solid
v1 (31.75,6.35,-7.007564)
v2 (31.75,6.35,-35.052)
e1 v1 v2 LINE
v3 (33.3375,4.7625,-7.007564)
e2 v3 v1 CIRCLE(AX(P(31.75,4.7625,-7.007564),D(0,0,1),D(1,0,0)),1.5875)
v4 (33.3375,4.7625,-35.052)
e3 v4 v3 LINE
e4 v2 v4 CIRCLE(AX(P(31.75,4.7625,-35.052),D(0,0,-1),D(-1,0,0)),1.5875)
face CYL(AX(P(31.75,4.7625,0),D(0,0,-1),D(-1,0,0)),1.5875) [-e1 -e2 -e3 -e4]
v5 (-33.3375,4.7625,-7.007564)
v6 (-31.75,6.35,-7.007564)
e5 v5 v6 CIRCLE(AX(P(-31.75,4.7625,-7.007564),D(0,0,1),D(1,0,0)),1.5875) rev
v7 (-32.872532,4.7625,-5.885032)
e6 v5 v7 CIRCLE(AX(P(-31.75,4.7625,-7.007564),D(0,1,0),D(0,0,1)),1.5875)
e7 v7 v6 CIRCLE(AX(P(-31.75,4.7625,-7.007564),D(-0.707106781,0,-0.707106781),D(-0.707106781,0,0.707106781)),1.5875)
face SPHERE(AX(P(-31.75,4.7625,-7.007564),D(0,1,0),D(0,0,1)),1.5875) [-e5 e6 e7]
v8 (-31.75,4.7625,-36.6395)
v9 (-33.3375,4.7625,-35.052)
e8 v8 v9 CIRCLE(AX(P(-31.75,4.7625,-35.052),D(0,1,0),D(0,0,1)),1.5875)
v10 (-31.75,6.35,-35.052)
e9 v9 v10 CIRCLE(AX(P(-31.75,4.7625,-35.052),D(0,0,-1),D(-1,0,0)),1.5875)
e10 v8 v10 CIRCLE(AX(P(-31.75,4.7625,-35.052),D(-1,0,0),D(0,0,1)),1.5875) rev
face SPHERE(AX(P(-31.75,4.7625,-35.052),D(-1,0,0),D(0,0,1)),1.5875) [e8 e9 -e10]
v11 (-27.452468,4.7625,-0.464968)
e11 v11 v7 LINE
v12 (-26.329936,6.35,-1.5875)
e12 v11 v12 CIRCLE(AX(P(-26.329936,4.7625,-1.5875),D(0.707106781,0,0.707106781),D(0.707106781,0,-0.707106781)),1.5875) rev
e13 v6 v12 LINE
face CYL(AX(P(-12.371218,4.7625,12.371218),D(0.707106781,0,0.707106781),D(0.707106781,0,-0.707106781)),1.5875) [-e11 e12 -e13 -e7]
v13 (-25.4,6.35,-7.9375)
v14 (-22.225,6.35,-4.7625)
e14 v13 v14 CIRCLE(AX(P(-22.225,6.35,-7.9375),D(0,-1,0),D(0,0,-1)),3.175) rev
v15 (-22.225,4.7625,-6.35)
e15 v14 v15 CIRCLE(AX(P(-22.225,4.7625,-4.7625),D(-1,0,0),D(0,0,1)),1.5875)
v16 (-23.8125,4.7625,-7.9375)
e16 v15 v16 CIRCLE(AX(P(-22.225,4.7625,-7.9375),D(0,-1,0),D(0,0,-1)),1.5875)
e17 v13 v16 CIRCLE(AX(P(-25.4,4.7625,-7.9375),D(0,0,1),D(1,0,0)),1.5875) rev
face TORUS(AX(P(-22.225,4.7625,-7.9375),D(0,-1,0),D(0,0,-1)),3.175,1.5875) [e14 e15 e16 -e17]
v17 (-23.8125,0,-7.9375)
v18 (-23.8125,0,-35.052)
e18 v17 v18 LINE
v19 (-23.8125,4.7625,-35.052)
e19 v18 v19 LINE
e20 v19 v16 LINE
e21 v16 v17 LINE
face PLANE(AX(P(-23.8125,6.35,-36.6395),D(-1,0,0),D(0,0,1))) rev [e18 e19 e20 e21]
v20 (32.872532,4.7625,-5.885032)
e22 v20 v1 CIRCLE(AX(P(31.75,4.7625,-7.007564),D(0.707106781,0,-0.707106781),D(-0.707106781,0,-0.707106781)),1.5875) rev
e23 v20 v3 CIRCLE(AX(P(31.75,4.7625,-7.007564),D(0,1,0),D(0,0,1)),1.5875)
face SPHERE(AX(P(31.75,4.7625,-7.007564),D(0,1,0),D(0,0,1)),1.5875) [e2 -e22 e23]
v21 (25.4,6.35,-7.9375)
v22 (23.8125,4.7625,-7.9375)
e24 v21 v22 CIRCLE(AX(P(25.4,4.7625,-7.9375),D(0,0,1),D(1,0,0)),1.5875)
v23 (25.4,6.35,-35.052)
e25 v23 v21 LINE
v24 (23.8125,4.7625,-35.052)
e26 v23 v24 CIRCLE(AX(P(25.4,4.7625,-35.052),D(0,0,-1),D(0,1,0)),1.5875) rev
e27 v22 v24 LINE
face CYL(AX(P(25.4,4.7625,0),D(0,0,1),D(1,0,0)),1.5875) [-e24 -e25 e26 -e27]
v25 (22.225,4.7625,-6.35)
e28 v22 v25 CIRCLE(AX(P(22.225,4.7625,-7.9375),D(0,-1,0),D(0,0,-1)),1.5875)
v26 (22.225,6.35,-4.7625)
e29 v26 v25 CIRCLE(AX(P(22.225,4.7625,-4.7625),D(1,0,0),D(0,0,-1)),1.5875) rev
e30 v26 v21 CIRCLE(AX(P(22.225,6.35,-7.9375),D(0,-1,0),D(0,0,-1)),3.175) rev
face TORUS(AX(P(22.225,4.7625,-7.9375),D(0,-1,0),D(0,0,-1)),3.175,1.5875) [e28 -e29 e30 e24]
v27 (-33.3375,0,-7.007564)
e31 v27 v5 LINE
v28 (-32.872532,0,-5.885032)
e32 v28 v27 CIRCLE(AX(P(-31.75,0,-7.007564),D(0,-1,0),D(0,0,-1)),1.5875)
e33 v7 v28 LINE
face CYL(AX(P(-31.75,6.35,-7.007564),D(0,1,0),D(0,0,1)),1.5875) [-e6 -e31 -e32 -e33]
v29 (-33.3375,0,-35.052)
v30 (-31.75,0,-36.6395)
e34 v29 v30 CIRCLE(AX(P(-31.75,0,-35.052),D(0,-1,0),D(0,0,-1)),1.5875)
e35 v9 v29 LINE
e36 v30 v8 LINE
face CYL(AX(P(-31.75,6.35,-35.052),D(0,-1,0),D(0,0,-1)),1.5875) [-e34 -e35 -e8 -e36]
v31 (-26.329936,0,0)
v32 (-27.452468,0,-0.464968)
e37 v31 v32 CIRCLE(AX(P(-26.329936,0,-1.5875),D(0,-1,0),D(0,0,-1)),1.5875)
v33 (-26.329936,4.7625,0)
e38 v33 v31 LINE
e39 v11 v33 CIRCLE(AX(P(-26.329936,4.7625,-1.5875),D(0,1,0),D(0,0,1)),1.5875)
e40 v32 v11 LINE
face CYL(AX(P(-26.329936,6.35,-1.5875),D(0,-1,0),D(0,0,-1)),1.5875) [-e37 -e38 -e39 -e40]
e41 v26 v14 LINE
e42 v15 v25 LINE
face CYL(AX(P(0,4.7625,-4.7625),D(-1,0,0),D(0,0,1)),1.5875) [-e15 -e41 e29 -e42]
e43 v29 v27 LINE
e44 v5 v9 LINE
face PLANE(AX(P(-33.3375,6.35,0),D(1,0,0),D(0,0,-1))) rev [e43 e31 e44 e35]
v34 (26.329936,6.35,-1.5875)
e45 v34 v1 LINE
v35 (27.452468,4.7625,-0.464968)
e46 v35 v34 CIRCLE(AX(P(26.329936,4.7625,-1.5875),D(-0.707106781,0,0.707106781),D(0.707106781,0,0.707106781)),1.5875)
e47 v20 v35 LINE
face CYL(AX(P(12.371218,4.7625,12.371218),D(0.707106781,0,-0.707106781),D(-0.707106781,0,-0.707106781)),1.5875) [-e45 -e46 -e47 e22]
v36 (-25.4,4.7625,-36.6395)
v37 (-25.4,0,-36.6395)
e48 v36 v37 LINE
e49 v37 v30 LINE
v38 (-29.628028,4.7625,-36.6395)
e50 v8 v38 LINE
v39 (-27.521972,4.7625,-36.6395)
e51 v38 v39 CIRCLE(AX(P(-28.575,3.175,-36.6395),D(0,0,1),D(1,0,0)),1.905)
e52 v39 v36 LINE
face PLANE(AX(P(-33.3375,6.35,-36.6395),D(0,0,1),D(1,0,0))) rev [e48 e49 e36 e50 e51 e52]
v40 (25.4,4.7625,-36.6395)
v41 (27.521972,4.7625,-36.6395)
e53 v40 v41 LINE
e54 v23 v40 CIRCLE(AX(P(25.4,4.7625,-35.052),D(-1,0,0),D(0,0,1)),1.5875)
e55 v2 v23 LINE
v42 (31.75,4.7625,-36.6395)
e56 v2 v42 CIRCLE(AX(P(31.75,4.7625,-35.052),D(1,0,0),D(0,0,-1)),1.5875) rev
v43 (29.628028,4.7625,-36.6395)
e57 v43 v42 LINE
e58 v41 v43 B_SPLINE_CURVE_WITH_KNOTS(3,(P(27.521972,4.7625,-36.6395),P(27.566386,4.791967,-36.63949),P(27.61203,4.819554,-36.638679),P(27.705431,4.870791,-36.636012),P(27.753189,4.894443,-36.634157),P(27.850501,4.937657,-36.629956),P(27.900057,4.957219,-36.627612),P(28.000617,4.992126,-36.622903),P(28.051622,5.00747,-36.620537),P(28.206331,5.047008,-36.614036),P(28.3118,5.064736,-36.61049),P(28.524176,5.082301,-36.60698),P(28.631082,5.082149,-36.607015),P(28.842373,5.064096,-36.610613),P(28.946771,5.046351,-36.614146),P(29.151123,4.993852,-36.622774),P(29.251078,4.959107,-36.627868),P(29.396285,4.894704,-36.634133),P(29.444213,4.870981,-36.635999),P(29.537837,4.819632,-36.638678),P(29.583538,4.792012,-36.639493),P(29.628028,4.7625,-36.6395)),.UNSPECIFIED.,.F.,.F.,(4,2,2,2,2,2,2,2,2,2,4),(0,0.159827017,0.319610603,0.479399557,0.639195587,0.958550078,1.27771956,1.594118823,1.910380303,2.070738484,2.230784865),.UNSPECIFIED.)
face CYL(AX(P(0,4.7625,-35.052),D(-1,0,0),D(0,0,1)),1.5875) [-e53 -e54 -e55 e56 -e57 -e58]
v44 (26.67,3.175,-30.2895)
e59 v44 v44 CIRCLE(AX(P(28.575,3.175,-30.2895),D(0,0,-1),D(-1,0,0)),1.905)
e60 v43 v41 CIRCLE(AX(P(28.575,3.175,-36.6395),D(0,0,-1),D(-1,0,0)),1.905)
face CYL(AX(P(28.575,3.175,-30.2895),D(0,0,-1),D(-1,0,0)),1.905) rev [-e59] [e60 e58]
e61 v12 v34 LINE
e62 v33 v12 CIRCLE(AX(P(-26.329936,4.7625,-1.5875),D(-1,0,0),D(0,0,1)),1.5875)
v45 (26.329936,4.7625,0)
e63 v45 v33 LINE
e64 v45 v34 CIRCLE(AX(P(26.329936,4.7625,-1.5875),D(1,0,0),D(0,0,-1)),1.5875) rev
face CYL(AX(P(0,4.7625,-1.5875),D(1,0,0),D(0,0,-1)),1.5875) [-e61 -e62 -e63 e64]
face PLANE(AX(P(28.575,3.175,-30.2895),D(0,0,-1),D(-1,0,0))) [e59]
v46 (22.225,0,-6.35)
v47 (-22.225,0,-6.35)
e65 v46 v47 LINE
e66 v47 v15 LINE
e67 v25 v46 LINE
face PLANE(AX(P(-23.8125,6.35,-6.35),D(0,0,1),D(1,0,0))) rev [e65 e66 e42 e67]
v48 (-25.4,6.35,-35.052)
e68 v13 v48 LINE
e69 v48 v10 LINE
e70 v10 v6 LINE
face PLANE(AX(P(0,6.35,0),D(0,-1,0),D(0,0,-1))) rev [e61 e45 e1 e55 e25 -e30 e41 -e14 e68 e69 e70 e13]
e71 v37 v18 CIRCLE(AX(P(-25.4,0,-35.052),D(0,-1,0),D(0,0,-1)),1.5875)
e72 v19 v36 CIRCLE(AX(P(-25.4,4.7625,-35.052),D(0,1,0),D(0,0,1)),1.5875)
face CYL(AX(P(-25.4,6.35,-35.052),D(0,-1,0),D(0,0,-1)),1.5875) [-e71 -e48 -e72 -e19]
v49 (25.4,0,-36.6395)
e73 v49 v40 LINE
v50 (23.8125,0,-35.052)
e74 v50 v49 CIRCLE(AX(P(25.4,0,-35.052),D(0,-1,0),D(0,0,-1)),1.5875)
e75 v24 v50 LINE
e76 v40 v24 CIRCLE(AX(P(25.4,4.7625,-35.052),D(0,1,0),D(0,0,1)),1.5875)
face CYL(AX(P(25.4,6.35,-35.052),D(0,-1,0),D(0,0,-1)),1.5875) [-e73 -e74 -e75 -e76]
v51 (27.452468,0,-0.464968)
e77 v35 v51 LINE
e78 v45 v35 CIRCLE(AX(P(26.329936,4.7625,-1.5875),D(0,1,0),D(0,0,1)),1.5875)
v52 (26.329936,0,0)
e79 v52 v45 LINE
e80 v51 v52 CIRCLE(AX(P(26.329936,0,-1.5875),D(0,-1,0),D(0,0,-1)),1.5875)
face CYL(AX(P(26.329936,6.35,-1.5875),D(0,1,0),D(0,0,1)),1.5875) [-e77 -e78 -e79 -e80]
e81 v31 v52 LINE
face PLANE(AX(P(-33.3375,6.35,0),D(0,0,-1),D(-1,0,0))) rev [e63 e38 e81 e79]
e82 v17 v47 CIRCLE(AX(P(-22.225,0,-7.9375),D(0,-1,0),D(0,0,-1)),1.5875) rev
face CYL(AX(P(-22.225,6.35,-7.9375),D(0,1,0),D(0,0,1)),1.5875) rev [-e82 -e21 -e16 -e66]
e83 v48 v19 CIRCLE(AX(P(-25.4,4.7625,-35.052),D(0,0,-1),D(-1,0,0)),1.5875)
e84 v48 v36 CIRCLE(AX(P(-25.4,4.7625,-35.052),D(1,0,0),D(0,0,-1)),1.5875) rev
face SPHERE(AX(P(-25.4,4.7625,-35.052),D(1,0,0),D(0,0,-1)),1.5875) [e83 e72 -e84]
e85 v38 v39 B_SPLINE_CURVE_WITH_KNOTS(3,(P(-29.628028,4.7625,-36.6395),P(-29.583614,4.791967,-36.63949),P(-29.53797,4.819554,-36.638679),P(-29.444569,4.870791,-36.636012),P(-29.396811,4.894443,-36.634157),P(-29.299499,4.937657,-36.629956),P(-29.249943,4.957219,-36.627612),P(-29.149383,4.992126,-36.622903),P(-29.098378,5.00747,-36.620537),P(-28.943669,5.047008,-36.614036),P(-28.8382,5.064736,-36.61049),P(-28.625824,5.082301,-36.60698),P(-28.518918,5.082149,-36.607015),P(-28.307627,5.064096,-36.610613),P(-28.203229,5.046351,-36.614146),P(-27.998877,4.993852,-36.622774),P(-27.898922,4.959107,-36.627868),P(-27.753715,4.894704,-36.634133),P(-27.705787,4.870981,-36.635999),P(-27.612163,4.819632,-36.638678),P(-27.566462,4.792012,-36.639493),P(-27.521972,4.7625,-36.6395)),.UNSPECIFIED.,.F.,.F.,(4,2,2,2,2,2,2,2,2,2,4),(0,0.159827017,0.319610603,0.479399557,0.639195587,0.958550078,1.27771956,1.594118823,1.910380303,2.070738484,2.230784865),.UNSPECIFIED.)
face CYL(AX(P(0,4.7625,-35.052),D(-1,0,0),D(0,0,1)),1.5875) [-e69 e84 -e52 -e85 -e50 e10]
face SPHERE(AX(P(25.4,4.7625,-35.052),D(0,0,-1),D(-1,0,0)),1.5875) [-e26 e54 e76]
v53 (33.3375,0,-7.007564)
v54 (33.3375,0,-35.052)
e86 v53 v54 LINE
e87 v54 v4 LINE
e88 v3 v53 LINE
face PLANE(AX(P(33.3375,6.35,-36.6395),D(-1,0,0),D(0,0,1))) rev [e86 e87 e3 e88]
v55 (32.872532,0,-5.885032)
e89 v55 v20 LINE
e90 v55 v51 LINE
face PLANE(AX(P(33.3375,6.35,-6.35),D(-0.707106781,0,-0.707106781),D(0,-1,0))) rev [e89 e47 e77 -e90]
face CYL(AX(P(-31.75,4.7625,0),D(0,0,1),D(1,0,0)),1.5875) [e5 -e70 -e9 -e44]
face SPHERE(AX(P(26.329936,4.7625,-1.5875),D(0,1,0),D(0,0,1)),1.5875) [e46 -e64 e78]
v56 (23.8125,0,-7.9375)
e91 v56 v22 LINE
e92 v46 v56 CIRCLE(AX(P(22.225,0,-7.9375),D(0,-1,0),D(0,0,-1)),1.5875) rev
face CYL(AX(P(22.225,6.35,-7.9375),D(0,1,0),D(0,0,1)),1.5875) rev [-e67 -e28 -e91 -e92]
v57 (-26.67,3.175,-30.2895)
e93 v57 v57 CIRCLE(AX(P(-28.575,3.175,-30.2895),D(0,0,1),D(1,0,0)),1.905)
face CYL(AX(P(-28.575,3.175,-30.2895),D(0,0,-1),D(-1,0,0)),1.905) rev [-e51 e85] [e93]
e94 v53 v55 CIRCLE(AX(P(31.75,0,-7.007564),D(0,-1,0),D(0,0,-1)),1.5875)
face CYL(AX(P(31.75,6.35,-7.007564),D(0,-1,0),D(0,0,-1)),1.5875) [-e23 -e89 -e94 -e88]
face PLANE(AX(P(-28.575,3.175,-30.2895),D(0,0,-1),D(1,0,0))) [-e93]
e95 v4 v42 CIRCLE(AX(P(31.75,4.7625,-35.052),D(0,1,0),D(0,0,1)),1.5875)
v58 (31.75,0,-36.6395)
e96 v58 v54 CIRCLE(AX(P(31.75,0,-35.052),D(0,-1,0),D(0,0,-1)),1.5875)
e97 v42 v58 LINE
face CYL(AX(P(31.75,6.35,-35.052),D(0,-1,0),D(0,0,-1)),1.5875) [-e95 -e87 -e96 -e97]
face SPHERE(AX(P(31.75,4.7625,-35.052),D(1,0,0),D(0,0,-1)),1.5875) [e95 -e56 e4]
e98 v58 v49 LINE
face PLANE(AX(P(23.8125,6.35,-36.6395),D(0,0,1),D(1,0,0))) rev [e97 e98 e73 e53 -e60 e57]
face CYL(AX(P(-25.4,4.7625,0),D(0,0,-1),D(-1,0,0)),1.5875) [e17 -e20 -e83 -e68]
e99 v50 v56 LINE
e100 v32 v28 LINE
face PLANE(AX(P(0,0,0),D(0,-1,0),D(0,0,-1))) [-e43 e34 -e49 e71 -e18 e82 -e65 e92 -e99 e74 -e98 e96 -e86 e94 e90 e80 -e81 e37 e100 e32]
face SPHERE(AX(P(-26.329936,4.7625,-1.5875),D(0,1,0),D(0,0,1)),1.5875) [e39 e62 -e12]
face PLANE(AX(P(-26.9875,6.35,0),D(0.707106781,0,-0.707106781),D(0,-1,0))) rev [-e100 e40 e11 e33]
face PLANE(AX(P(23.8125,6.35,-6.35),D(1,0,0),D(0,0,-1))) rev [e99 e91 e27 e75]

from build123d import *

# Parameters (mm, degrees)
BOSS_EXTRUDE1_DEPTH = 6.35
SKETCH2_R           = 1.905
CUT_EXTRUDE1_DEPTH  = 6.35
CHAMFER1_SIZE       = 6.35
FILLET2_R           = 1.5875


with BuildPart() as part:
    # Sketch1 → Boss-Extrude1 (new body)
    with BuildSketch(Plane(origin=(0, 0, 0), x_dir=(1, 0, 0), z_dir=(0, 1, 0))):
        Polygon((-33.3375, 0), (33.3375, 0), (33.3375, 36.6395), (23.8125, 36.6395), (23.8125, 6.35), (-23.8125, 6.35), (-23.8125, 36.6395), (-33.3375, 36.6395), align=None)
    extrude(amount=BOSS_EXTRUDE1_DEPTH)

    # Sketch2 → Cut-Extrude1 (cut)
    with BuildSketch(Plane(origin=(0, 0, -36.6395), x_dir=(-1, 0, 0), z_dir=(0, 0, -1))):
        with Locations((-28.575, 3.175)):
            Circle(SKETCH2_R)
    cut_extrude1 = extrude(amount=-CUT_EXTRUDE1_DEPTH, mode=Mode.SUBTRACT)

    # Mirror1: Cut-Extrude1 across plane
    add(cut_extrude1.mirror(Plane(origin=(0, 0, 0), x_dir=(0, 0, 1), z_dir=(1, 0, 0))), mode=Mode.SUBTRACT)

    # Chamfer1
    chamfer1_edges = [part.edges().sort_by_distance(p)[0] for p in [
        (33.3375, 3.175, 0),
        (-33.3375, 3.175, 0),
    ]]
    chamfer(chamfer1_edges, length=CHAMFER1_SIZE)

    # Fillet2
    # the kernel refuses this fillet: 1.5875 mm, written as the material it adds along each edge
    with BuildSketch(Plane(origin=(-23.8125, 0, -6.35), x_dir=(0, 0, -1), z_dir=(0, 1, 0))) as fillet2_piece_1:
        with BuildLine():
            CenterArc((FILLET2_R, -FILLET2_R), FILLET2_R, 90, 90)
            Line((0, -FILLET2_R), (0, 0))
            Line((0, 0), (FILLET2_R, 0))
        make_face()
    extrude(amount=6.35)
    with BuildSketch(Plane(origin=(23.8125, 0, -6.35), x_dir=(0, 0, -1), z_dir=(0, 1, 0))) as fillet2_piece_2:
        with BuildLine():
            CenterArc((FILLET2_R, FILLET2_R), FILLET2_R, 180, 90)
            Line((0, FILLET2_R), (0, 0))
            Line((0, 0), (FILLET2_R, 0))
        make_face()
    extrude(amount=6.35)
    # the kernel refuses this fillet: 1.5875 mm, written as the material it takes off along each edge
    with BuildSketch(Plane(origin=(-31.75, 4.7625, -35.052), x_dir=(-1, 0, 0), z_dir=(0, 1, 0))) as fillet2_2_piece_1_section:
        Polygon((0, 0), (FILLET2_R, 0), (FILLET2_R, -FILLET2_R), (0, -FILLET2_R), align=None)
    fillet2_2_piece_1 = extrude(amount=FILLET2_R, mode=Mode.PRIVATE)
    fillet2_2_piece_1 = fillet2_2_piece_1 - Plane(origin=(-31.75, 4.7625, -35.052), x_dir=(0.7071067811865475, 0, 0.7071067811865475), z_dir=(0, 1, 0)) * Sphere(FILLET2_R, mode=Mode.PRIVATE)
    add(fillet2_2_piece_1, mode=Mode.SUBTRACT)
    with BuildSketch(Plane(origin=(31.75, 4.7625, -35.052), x_dir=(0, 1, 0), z_dir=(0, 0, -1))) as fillet2_2_piece_2_section:
        Polygon((0, 0), (FILLET2_R, 0), (FILLET2_R, FILLET2_R), (0, FILLET2_R), align=None)
    fillet2_2_piece_2 = extrude(amount=FILLET2_R, mode=Mode.PRIVATE)
    fillet2_2_piece_2 = fillet2_2_piece_2 - Plane(origin=(31.75, 4.7625, -35.052), x_dir=(-0.7071067811865475, -0.7071067811865475, 0), z_dir=(0, 0, -1)) * Sphere(FILLET2_R, mode=Mode.PRIVATE)
    add(fillet2_2_piece_2, mode=Mode.SUBTRACT)
    with BuildSketch(Plane(origin=(-26.32993597, 4.7625, -1.5875), x_dir=(0, 0, 1), z_dir=(0, 1, 0))) as fillet2_2_piece_3_section:
        Polygon((0, 0), (FILLET2_R, 0), (FILLET2_R, -FILLET2_R * 0.414213562373), (FILLET2_R * 0.707106781187, -FILLET2_R * 0.707106781187), align=None)
    fillet2_2_piece_3 = extrude(amount=FILLET2_R, mode=Mode.PRIVATE)
    fillet2_2_piece_3 = fillet2_2_piece_3 - Plane(origin=(-26.32993597, 4.7625, -1.5875), x_dir=(0.38268343236508956, 0, -0.9238795325112867), z_dir=(0, 1, 0)) * Sphere(FILLET2_R, mode=Mode.PRIVATE)
    add(fillet2_2_piece_3, mode=Mode.SUBTRACT)
    with BuildSketch(Plane(origin=(26.32993597, 4.7625, -1.5875), x_dir=(0, 0, 1), z_dir=(0, 1, 0))) as fillet2_2_piece_4_section:
        Polygon((0, 0), (FILLET2_R, 0), (FILLET2_R, FILLET2_R * 0.414213562373), (FILLET2_R * 0.707106781187, FILLET2_R * 0.707106781187), align=None)
    fillet2_2_piece_4 = extrude(amount=FILLET2_R, mode=Mode.PRIVATE)
    fillet2_2_piece_4 = fillet2_2_piece_4 - Plane(origin=(26.32993597, 4.7625, -1.5875), x_dir=(-0.3826834323650899, 0, -0.9238795325112866), z_dir=(0, 1, 0)) * Sphere(FILLET2_R, mode=Mode.PRIVATE)
    add(fillet2_2_piece_4, mode=Mode.SUBTRACT)
    with BuildSketch(Plane(origin=(-31.75, 4.7625, -7.00756403), x_dir=(-1, 0, 0), z_dir=(0, 1, 0))) as fillet2_2_piece_5_section:
        Polygon((0, 0), (FILLET2_R, 0), (FILLET2_R, FILLET2_R * 0.414213562373), (FILLET2_R * 0.707106781187, FILLET2_R * 0.707106781187), align=None)
    fillet2_2_piece_5 = extrude(amount=FILLET2_R, mode=Mode.PRIVATE)
    fillet2_2_piece_5 = fillet2_2_piece_5 - Plane(origin=(-31.75, 4.7625, -7.00756403), x_dir=(0.9238795325112866, 0, -0.38268343236508984), z_dir=(0, 1, 0)) * Sphere(FILLET2_R, mode=Mode.PRIVATE)
    add(fillet2_2_piece_5, mode=Mode.SUBTRACT)
    with BuildSketch(Plane(origin=(31.75, 4.7625, -7.00756403), x_dir=(1, 0, 0), z_dir=(0, 1, 0))) as fillet2_2_piece_6_section:
        Polygon((0, 0), (FILLET2_R, 0), (FILLET2_R, -FILLET2_R * 0.414213562373), (FILLET2_R * 0.707106781187, -FILLET2_R * 0.707106781187), align=None)
    fillet2_2_piece_6 = extrude(amount=FILLET2_R, mode=Mode.PRIVATE)
    fillet2_2_piece_6 = fillet2_2_piece_6 - Plane(origin=(31.75, 4.7625, -7.00756403), x_dir=(-0.9238795325112868, 0, -0.38268343236508967), z_dir=(0, 1, 0)) * Sphere(FILLET2_R, mode=Mode.PRIVATE)
    add(fillet2_2_piece_6, mode=Mode.SUBTRACT)
    with BuildSketch(Plane(origin=(-33.3375, -3.96875, -36.6395), x_dir=(0, 0, 1), z_dir=(0, 1, 0))) as fillet2_2_piece_7:
        with BuildLine():
            CenterArc((FILLET2_R, FILLET2_R), FILLET2_R, 180, 90)
            Line((0, FILLET2_R), (0, 0))
            Line((0, 0), (FILLET2_R, 0))
        make_face()
    extrude(amount=8.73125, mode=Mode.SUBTRACT)
    with BuildSketch(Plane(origin=(-23.8125, -3.96875, -36.6395), x_dir=(-1, 0, 0), z_dir=(0, 1, 0))) as fillet2_2_piece_8:
        with BuildLine():
            CenterArc((FILLET2_R, FILLET2_R), FILLET2_R, 180, 90)
            Line((0, FILLET2_R), (0, 0))
            Line((0, 0), (FILLET2_R, 0))
        make_face()
    extrude(amount=14.2875, mode=Mode.SUBTRACT)
    with BuildSketch(Plane(origin=(23.8125, -3.96875, -36.6395), x_dir=(1, 0, 0), z_dir=(0, 1, 0))) as fillet2_2_piece_9:
        with BuildLine():
            CenterArc((FILLET2_R, -FILLET2_R), FILLET2_R, 90, 90)
            Line((0, -FILLET2_R), (0, 0))
            Line((0, 0), (FILLET2_R, 0))
        make_face()
    extrude(amount=14.2875, mode=Mode.SUBTRACT)
    with BuildSketch(Plane(origin=(33.3375, -3.96875, -36.6395), x_dir=(0, 0, 1), z_dir=(0, 1, 0))) as fillet2_2_piece_10:
        with BuildLine():
            CenterArc((FILLET2_R, -FILLET2_R), FILLET2_R, 90, 90)
            Line((0, -FILLET2_R), (0, 0))
            Line((0, 0), (FILLET2_R, 0))
        make_face()
    extrude(amount=8.73125, mode=Mode.SUBTRACT)
    with BuildSketch(Plane(origin=(31.75, 6.35, -36.6395), x_dir=(0, 0, 1), z_dir=(-1, 0, 0)), Plane(origin=(-19.84375, 6.35, -36.6395), x_dir=(0, 0, 1), z_dir=(-1, 0, 0))) as fillet2_2_piece_11:
        with BuildLine():
            CenterArc((FILLET2_R, -FILLET2_R), FILLET2_R, 90, 90)
            Line((0, -FILLET2_R), (0, 0))
            Line((0, 0), (FILLET2_R, 0))
        make_face()
    extrude(amount=11.90625, mode=Mode.SUBTRACT)
    with BuildSketch(Plane(origin=(-26.32993597, 6.35, 0), x_dir=(0, -1, 0), z_dir=(1, 0, 0))) as fillet2_2_piece_12:
        with BuildLine():
            CenterArc((FILLET2_R, FILLET2_R), FILLET2_R, 180, 90)
            Line((0, FILLET2_R), (0, 0))
            Line((0, 0), (FILLET2_R, 0))
        make_face()
    extrude(amount=52.659871939, mode=Mode.SUBTRACT)
    with BuildSketch(Plane(origin=(26.9875, -1.643910076, 0), x_dir=(-1, 0, 0), z_dir=(0, 1, 0)), Plane(origin=(33.3375, -1.643910076, -6.35), x_dir=(-0.7071067811865448, 0, 0.7071067811865502), z_dir=(0, 1, 0))) as fillet2_2_piece_13:
        with BuildLine():
            CenterArc((FILLET2_R * 0.414213562373, -FILLET2_R), FILLET2_R, 90, 45)
            Line((-FILLET2_R * 0.292893218813, -FILLET2_R * 0.292893218813), (0, 0))
            Line((0, 0), (FILLET2_R * 0.414213562373, 0))
        make_face()
    extrude(amount=6.406410076, mode=Mode.SUBTRACT)
    with BuildSketch(Plane(origin=(-26.9875, -1.643910076, 0), x_dir=(1, 0, 0), z_dir=(0, 1, 0)), Plane(origin=(-33.3375, -1.643910076, -6.35), x_dir=(0.7071067811865468, 0, 0.7071067811865482), z_dir=(0, 1, 0))) as fillet2_2_piece_14:
        with BuildLine():
            CenterArc((FILLET2_R * 0.414213562373, FILLET2_R), FILLET2_R, 225, 45)
            Line((-FILLET2_R * 0.292893218813, FILLET2_R * 0.292893218813), (0, 0))
            Line((0, 0), (FILLET2_R * 0.414213562373, 0))
        make_face()
    extrude(amount=6.406410076, mode=Mode.SUBTRACT)
    with BuildSketch(Plane(origin=(33.3375, 6.35, -7.00756403), x_dir=(-1, 0, 0), z_dir=(0, 0, -1)), Plane(origin=(-33.3375, 6.35, -35.052), x_dir=(1, 0, 0), z_dir=(0, 0, 1))) as fillet2_2_piece_15:
        with BuildLine():
            CenterArc((FILLET2_R, -FILLET2_R), FILLET2_R, 90, 90)
            Line((0, -FILLET2_R), (0, 0))
            Line((0, 0), (FILLET2_R, 0))
        make_face()
    extrude(amount=28.04443597, mode=Mode.SUBTRACT)
    with BuildSketch(Plane(origin=(27.452467985, 6.35, -0.464967985), x_dir=(0, -1, 0), z_dir=(0.7071067811865476, 0, -0.7071067811865476))) as fillet2_2_piece_16:
        with BuildLine():
            CenterArc((FILLET2_R, FILLET2_R), FILLET2_R, 180, 90)
            Line((0, FILLET2_R), (0, 0))
            Line((0, 0), (FILLET2_R, 0))
        make_face()
    extrude(amount=7.665128061, mode=Mode.SUBTRACT)
    with BuildSketch(Plane(origin=(-27.452467985, 6.35, -0.464967985), x_dir=(0, -1, 0), z_dir=(-0.7071067811865477, 0, -0.7071067811865475))) as fillet2_2_piece_17:
        with BuildLine():
            CenterArc((FILLET2_R, -FILLET2_R), FILLET2_R, 90, 90)
            Line((0, -FILLET2_R), (0, 0))
            Line((0, 0), (FILLET2_R, 0))
        make_face()
    extrude(amount=7.665128061, mode=Mode.SUBTRACT)
    # the kernel refuses this fillet: 1.5875 mm, written as the material it takes off along each edge
    with BuildSketch(Plane(origin=(-25.4, 4.7625, -35.052), x_dir=(0, 1, 0), z_dir=(1, 0, 0))) as fillet2_3_piece_1_section:
        Polygon((0, 0), (FILLET2_R, 0), (FILLET2_R, -FILLET2_R), (0, -FILLET2_R), align=None)
    fillet2_3_piece_1 = extrude(amount=FILLET2_R, mode=Mode.PRIVATE)
    fillet2_3_piece_1 = fillet2_3_piece_1 - Plane(origin=(-25.4, 4.7625, -35.052), x_dir=(0, -0.7071067811865475, 0.7071067811865475), z_dir=(1, 0, 0)) * Sphere(FILLET2_R, mode=Mode.PRIVATE)
    add(fillet2_3_piece_1, mode=Mode.SUBTRACT)
    with BuildSketch(Plane(origin=(25.4, 4.7625, -35.052), x_dir=(0, 1, 0), z_dir=(-1, 0, 0))) as fillet2_3_piece_2_section:
        Polygon((0, 0), (FILLET2_R, 0), (FILLET2_R, FILLET2_R), (0, FILLET2_R), align=None)
    fillet2_3_piece_2 = extrude(amount=FILLET2_R, mode=Mode.PRIVATE)
    fillet2_3_piece_2 = fillet2_3_piece_2 - Plane(origin=(25.4, 4.7625, -35.052), x_dir=(0, -0.7071067811865475, 0.7071067811865475), z_dir=(-1, 0, 0)) * Sphere(FILLET2_R, mode=Mode.PRIVATE)
    add(fillet2_3_piece_2, mode=Mode.SUBTRACT)
    with BuildSketch(Plane(origin=(23.8125, 6.35, -35.052), x_dir=(0, -1, 0), z_dir=(0, 0, 1)), Plane(origin=(-23.8125, 6.35, -7.9375), x_dir=(0, -1, 0), z_dir=(0, 0, -1))) as fillet2_3_piece_3:
        with BuildLine():
            CenterArc((FILLET2_R, FILLET2_R), FILLET2_R, 180, 90)
            Line((0, FILLET2_R), (0, 0))
            Line((0, 0), (FILLET2_R, 0))
        make_face()
    extrude(amount=27.1145, mode=Mode.SUBTRACT)
    with BuildSketch(Plane(origin=(22.225, 6.35, -6.35), x_dir=(0, -1, 0), z_dir=(-1, 0, 0))) as fillet2_3_piece_4:
        with BuildLine():
            CenterArc((FILLET2_R, FILLET2_R), FILLET2_R, 180, 90)
            Line((0, FILLET2_R), (0, 0))
            Line((0, 0), (FILLET2_R, 0))
        make_face()
    extrude(amount=44.45, mode=Mode.SUBTRACT)
    with BuildSketch(Plane(origin=(-22.225, 6.35, -7.9375), x_dir=(-1, 0, 0), z_dir=(0, 0, -1))) as fillet2_3_piece_5:
        with BuildLine():
            CenterArc((1.5875 + FILLET2_R, -FILLET2_R), FILLET2_R, 90, 90)
            Line((1.5875 + FILLET2_R, 0), (1.5875, 0))
            Line((1.5875, 0), (1.5875, -FILLET2_R))
        make_face()
    revolve(axis=Axis((-22.225, 6.35, -7.9375), (0, 1, 0)), revolution_arc=90, mode=Mode.SUBTRACT)
    with BuildSketch(Plane(origin=(22.225, 6.35, -7.9375), x_dir=(1, 0, 0), z_dir=(0, 0, -1))) as fillet2_3_piece_6:
        with BuildLine():
            CenterArc((1.5875 + FILLET2_R, FILLET2_R), FILLET2_R, 180, 90)
            Line((1.5875 + FILLET2_R, 0), (1.5875, 0))
            Line((1.5875, 0), (1.5875, FILLET2_R))
        make_face()
    revolve(axis=Axis((22.225, 6.35, -7.9375), (0, -1, 0)), revolution_arc=90, mode=Mode.SUBTRACT)


solid = part.part
